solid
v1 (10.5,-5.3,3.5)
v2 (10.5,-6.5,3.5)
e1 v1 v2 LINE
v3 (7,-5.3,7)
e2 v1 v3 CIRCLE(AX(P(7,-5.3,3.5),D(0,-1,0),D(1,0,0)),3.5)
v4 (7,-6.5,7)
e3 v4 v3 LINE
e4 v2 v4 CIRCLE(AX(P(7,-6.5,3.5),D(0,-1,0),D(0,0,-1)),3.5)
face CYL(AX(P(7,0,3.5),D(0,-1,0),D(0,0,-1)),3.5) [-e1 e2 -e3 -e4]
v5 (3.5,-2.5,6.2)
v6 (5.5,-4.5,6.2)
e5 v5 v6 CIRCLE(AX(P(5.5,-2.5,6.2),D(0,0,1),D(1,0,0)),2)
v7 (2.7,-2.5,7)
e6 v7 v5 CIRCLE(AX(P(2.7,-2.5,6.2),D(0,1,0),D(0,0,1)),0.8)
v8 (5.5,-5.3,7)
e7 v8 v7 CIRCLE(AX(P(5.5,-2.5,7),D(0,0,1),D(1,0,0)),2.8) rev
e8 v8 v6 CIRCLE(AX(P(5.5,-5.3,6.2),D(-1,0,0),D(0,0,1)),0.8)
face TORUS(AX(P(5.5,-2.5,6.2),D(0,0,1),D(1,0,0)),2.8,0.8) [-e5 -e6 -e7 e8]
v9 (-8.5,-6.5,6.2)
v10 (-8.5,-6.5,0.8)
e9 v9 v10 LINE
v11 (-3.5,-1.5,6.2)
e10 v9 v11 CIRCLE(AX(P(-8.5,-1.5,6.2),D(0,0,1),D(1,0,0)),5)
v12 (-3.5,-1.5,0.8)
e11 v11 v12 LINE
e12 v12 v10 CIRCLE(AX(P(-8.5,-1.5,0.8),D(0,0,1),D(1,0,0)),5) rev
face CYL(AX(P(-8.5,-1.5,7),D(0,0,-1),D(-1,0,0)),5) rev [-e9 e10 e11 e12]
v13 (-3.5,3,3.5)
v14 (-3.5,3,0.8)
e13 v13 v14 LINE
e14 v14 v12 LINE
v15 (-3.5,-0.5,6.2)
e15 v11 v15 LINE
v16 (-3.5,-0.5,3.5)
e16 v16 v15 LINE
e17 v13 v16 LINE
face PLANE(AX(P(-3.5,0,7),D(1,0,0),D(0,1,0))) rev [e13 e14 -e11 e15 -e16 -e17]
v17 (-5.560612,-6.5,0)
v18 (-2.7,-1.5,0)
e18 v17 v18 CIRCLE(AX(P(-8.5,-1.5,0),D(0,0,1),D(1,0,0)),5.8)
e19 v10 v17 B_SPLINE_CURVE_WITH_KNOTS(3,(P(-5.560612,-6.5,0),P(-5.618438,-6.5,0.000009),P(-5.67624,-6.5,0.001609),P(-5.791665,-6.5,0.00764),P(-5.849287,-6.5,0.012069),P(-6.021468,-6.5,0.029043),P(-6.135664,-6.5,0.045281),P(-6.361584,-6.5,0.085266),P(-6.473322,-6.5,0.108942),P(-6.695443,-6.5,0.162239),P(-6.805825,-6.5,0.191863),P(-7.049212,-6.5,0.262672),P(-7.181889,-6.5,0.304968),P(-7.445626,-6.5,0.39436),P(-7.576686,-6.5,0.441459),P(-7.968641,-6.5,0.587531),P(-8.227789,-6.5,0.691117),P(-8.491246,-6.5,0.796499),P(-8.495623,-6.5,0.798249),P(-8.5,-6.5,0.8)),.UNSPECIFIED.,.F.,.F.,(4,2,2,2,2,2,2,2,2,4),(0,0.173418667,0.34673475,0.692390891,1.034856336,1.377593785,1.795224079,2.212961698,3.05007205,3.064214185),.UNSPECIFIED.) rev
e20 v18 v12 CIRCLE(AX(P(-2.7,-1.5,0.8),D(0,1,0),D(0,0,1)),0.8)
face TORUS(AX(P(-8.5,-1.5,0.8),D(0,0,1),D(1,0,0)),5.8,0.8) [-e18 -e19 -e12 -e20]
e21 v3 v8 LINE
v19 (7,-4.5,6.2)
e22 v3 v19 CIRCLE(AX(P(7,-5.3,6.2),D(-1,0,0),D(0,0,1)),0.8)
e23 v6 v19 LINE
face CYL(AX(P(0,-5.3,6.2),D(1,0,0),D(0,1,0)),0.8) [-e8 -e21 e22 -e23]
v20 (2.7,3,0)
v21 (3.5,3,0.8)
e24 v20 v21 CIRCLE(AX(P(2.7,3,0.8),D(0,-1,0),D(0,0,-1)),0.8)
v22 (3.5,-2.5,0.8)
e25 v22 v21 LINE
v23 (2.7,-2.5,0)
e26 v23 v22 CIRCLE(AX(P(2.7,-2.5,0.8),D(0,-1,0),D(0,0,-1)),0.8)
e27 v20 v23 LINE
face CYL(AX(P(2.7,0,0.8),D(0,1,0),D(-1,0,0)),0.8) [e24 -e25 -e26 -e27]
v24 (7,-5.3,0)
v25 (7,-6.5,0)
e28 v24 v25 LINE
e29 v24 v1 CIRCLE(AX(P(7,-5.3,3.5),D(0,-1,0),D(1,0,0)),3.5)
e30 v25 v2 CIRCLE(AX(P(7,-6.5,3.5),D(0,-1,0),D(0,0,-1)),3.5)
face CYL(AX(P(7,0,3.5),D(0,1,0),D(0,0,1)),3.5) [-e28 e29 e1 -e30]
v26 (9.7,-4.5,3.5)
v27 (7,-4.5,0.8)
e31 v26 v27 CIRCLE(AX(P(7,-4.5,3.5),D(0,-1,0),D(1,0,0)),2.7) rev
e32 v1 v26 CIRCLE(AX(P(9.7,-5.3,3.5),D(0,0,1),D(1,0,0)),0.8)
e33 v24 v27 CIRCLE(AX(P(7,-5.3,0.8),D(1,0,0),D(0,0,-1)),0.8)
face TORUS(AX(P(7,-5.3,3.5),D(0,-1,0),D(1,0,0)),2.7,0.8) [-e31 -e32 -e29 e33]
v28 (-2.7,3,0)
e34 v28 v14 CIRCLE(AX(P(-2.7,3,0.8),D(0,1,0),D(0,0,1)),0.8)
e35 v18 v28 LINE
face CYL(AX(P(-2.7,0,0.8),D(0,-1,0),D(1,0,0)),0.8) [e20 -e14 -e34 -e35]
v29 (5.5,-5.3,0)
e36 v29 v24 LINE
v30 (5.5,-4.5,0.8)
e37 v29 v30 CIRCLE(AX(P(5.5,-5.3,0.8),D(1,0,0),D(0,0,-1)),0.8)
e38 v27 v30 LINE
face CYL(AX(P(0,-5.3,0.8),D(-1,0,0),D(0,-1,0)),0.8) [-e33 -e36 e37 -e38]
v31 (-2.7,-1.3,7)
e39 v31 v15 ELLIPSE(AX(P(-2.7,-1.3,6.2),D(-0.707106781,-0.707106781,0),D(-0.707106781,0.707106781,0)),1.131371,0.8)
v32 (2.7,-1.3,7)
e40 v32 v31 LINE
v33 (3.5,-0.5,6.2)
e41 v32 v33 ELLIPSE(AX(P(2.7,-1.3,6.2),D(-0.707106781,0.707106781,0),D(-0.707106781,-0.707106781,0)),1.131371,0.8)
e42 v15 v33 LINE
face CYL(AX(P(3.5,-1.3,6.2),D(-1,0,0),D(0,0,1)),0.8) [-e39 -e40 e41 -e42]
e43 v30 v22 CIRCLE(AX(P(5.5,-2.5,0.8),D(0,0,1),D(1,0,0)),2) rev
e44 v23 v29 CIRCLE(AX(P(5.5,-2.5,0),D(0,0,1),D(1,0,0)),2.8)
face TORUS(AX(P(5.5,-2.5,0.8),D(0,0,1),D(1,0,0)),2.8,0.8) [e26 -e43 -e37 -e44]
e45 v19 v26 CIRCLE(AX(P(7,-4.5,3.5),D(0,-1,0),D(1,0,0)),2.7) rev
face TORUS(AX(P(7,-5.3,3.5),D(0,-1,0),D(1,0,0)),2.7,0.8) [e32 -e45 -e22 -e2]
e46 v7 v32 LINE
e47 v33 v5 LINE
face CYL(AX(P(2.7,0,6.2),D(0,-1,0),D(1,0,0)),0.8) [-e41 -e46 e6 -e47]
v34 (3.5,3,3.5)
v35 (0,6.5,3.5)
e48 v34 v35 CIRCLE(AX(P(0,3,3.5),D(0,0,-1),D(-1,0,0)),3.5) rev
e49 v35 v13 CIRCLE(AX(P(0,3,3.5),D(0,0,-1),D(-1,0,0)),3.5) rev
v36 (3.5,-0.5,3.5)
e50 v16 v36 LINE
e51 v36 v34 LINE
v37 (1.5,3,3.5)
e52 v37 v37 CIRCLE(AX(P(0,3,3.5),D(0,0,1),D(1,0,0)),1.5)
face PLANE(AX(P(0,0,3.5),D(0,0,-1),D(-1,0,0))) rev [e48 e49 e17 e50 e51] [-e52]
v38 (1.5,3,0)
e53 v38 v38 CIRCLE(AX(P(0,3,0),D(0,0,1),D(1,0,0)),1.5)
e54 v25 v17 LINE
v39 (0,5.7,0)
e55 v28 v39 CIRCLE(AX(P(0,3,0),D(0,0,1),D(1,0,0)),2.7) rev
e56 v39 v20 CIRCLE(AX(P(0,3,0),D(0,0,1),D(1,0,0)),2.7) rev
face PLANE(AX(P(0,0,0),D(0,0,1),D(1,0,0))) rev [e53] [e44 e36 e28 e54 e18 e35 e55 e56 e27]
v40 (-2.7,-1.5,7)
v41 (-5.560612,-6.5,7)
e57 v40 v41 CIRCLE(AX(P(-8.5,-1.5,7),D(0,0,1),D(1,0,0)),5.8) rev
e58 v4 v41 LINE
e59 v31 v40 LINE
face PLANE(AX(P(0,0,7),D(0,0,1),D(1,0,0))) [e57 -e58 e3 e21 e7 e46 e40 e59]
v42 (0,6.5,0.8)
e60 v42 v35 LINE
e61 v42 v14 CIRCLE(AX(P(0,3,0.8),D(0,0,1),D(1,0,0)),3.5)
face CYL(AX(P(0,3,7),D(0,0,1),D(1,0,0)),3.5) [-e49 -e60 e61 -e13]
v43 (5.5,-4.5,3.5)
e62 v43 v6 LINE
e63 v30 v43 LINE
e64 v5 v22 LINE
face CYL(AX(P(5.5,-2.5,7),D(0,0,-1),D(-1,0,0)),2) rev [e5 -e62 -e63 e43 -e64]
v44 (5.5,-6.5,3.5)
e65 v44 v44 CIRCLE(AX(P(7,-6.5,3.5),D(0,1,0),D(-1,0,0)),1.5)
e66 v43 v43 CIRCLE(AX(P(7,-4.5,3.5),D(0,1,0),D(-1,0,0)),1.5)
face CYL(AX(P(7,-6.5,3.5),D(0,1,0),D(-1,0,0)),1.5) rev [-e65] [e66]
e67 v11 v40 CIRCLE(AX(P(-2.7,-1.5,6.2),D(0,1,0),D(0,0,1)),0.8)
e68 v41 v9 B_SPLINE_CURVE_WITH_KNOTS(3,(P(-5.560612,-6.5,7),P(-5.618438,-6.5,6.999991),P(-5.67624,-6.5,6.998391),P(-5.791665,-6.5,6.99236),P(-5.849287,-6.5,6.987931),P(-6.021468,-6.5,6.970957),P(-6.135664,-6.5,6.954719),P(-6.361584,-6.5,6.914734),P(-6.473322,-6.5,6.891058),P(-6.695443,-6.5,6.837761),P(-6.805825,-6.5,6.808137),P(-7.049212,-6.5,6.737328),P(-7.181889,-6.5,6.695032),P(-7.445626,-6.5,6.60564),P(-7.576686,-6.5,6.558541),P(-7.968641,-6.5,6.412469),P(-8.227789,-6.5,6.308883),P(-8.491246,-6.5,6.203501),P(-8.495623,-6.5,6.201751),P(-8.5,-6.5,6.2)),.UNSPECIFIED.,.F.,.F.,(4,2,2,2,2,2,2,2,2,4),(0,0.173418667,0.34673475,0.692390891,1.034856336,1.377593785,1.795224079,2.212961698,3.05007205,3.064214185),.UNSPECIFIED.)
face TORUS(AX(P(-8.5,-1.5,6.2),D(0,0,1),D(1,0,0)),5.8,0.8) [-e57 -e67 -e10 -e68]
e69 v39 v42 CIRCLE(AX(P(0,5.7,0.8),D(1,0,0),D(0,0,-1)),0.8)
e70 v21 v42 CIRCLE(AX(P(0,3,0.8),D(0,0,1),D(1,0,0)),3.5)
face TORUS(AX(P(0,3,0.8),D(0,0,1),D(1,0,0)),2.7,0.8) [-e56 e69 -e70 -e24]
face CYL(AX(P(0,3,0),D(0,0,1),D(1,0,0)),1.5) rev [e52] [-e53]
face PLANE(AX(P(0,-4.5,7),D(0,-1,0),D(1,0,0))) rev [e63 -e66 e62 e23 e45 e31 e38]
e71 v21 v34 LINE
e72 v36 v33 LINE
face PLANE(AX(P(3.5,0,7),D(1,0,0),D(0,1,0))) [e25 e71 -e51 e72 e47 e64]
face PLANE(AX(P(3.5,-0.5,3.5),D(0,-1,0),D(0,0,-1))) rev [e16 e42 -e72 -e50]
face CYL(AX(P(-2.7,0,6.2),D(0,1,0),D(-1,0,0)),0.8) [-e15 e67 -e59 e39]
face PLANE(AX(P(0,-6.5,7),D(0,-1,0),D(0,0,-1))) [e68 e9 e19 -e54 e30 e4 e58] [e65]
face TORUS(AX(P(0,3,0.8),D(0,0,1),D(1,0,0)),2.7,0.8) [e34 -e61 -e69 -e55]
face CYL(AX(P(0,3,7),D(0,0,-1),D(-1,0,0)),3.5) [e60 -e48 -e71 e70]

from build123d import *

# Parameters (mm, degrees)
SKETCH_1_W          = 7
SKETCH_1_H          = 13
SKETCH_1_H_2        = 2
EXTRUDE_1_DEPTH     = 7
SKETCH_2_W          = 7
SKETCH_2_H          = 7
CUT_EXTRUDE_1_DEPTH = 3.5
FILLET_1_R          = 3.5
SKETCH_3_R          = 1.5
CUT_EXTRUDE_2_DEPTH = 13.835497653
SKETCH_4_R          = 1.5
CUT_EXTRUDE_3_DEPTH = 17.740669043
FILLET_2_R          = 2
FILLET_3_R          = 0.8


with BuildPart() as part:
    # 草图1 → 凸台-拉伸1 (new body)
    with BuildSketch(Plane.XY):
        with BuildLine():
            Line((-8.5, -6.5), (-3.5, -6.5))
            Line((-3.5, -6.5), (-3.5, -1.5))
            ThreePointArc((-3.5, -1.5), (-4.964466094, -5.035533906), (-8.5, -6.5))
        make_face()
        Rectangle(SKETCH_1_W, SKETCH_1_H)
        with Locations((7, -5.5)):
            Rectangle(SKETCH_1_W, SKETCH_1_H_2)
    extrude(amount=EXTRUDE_1_DEPTH)

    # 草图2 → 切除-拉伸1 (cut)
    with BuildSketch(Plane.XY.offset(7)):
        with Locations((0, 3)):
            Rectangle(SKETCH_2_W, SKETCH_2_H)
    extrude(amount=-CUT_EXTRUDE_1_DEPTH, mode=Mode.SUBTRACT)

    # 圆角1
    fillet_1_edges = [part.edges().sort_by_distance(p)[0] for p in [
        (10.5, -5.5, 0),
        (10.5, -5.5, 7),
        (3.5, 6.5, 1.75),
        (-3.5, 6.5, 1.75),
    ]]
    fillet(fillet_1_edges, radius=FILLET_1_R - 0.0001)  # a hair under: the kernel refuses the full size

    # 草图3 → 切除-拉伸2 (cut, through all)
    with BuildSketch(Plane.XY.offset(3.5)):
        with Locations((0, 3)):
            Circle(SKETCH_3_R)
    extrude(amount=-CUT_EXTRUDE_2_DEPTH, mode=Mode.SUBTRACT)

    # 草图4 → 切除-拉伸3 (cut, through all)
    with BuildSketch(Plane(origin=(0, -4.5, 0), x_dir=(1, 0, 0), z_dir=(0, 1, 0))):
        with Locations(Location((7, -3.5, 0), (0, 0, 180))):
            Circle(SKETCH_4_R)
    extrude(amount=-CUT_EXTRUDE_3_DEPTH, mode=Mode.SUBTRACT)

    # 圆角2
    fillet_2_edges = [part.edges().sort_by_distance(p)[0] for p in [
        (3.5, -4.5, 3.5),
    ]]
    fillet(fillet_2_edges, radius=FILLET_2_R - 0.0001)  # a hair under: the kernel refuses the full size

    # 圆角3
    fillet_3_edges = [part.edges().sort_by_distance(p)[0] for p in [
        (-4.964466094, -5.035533906, 0),
        (3.5, -1.50005, 7),
        (-3.5, -1, 7),
        (0, -0.5, 7),
        (-4.964466094, -5.035533906, 7),
        (6.25, -4.5, 0),
        (6.25, -4.5, 7),
        (9.474903023, -4.5, 5.974903023),
        (9.474903023, -4.5, 1.025096977),
        (-3.5, 0.75005, 0),
        (3.5, 0.25, 0),
        (-2.474903023, 5.474903023, 0),
        (2.474903023, 5.474903023, 0),
        (4.085757148, -3.914242852, 0),
        (4.085757148, -3.914242852, 7),
    ]]
    fillet(fillet_3_edges, radius=FILLET_3_R)


solid = part.part
